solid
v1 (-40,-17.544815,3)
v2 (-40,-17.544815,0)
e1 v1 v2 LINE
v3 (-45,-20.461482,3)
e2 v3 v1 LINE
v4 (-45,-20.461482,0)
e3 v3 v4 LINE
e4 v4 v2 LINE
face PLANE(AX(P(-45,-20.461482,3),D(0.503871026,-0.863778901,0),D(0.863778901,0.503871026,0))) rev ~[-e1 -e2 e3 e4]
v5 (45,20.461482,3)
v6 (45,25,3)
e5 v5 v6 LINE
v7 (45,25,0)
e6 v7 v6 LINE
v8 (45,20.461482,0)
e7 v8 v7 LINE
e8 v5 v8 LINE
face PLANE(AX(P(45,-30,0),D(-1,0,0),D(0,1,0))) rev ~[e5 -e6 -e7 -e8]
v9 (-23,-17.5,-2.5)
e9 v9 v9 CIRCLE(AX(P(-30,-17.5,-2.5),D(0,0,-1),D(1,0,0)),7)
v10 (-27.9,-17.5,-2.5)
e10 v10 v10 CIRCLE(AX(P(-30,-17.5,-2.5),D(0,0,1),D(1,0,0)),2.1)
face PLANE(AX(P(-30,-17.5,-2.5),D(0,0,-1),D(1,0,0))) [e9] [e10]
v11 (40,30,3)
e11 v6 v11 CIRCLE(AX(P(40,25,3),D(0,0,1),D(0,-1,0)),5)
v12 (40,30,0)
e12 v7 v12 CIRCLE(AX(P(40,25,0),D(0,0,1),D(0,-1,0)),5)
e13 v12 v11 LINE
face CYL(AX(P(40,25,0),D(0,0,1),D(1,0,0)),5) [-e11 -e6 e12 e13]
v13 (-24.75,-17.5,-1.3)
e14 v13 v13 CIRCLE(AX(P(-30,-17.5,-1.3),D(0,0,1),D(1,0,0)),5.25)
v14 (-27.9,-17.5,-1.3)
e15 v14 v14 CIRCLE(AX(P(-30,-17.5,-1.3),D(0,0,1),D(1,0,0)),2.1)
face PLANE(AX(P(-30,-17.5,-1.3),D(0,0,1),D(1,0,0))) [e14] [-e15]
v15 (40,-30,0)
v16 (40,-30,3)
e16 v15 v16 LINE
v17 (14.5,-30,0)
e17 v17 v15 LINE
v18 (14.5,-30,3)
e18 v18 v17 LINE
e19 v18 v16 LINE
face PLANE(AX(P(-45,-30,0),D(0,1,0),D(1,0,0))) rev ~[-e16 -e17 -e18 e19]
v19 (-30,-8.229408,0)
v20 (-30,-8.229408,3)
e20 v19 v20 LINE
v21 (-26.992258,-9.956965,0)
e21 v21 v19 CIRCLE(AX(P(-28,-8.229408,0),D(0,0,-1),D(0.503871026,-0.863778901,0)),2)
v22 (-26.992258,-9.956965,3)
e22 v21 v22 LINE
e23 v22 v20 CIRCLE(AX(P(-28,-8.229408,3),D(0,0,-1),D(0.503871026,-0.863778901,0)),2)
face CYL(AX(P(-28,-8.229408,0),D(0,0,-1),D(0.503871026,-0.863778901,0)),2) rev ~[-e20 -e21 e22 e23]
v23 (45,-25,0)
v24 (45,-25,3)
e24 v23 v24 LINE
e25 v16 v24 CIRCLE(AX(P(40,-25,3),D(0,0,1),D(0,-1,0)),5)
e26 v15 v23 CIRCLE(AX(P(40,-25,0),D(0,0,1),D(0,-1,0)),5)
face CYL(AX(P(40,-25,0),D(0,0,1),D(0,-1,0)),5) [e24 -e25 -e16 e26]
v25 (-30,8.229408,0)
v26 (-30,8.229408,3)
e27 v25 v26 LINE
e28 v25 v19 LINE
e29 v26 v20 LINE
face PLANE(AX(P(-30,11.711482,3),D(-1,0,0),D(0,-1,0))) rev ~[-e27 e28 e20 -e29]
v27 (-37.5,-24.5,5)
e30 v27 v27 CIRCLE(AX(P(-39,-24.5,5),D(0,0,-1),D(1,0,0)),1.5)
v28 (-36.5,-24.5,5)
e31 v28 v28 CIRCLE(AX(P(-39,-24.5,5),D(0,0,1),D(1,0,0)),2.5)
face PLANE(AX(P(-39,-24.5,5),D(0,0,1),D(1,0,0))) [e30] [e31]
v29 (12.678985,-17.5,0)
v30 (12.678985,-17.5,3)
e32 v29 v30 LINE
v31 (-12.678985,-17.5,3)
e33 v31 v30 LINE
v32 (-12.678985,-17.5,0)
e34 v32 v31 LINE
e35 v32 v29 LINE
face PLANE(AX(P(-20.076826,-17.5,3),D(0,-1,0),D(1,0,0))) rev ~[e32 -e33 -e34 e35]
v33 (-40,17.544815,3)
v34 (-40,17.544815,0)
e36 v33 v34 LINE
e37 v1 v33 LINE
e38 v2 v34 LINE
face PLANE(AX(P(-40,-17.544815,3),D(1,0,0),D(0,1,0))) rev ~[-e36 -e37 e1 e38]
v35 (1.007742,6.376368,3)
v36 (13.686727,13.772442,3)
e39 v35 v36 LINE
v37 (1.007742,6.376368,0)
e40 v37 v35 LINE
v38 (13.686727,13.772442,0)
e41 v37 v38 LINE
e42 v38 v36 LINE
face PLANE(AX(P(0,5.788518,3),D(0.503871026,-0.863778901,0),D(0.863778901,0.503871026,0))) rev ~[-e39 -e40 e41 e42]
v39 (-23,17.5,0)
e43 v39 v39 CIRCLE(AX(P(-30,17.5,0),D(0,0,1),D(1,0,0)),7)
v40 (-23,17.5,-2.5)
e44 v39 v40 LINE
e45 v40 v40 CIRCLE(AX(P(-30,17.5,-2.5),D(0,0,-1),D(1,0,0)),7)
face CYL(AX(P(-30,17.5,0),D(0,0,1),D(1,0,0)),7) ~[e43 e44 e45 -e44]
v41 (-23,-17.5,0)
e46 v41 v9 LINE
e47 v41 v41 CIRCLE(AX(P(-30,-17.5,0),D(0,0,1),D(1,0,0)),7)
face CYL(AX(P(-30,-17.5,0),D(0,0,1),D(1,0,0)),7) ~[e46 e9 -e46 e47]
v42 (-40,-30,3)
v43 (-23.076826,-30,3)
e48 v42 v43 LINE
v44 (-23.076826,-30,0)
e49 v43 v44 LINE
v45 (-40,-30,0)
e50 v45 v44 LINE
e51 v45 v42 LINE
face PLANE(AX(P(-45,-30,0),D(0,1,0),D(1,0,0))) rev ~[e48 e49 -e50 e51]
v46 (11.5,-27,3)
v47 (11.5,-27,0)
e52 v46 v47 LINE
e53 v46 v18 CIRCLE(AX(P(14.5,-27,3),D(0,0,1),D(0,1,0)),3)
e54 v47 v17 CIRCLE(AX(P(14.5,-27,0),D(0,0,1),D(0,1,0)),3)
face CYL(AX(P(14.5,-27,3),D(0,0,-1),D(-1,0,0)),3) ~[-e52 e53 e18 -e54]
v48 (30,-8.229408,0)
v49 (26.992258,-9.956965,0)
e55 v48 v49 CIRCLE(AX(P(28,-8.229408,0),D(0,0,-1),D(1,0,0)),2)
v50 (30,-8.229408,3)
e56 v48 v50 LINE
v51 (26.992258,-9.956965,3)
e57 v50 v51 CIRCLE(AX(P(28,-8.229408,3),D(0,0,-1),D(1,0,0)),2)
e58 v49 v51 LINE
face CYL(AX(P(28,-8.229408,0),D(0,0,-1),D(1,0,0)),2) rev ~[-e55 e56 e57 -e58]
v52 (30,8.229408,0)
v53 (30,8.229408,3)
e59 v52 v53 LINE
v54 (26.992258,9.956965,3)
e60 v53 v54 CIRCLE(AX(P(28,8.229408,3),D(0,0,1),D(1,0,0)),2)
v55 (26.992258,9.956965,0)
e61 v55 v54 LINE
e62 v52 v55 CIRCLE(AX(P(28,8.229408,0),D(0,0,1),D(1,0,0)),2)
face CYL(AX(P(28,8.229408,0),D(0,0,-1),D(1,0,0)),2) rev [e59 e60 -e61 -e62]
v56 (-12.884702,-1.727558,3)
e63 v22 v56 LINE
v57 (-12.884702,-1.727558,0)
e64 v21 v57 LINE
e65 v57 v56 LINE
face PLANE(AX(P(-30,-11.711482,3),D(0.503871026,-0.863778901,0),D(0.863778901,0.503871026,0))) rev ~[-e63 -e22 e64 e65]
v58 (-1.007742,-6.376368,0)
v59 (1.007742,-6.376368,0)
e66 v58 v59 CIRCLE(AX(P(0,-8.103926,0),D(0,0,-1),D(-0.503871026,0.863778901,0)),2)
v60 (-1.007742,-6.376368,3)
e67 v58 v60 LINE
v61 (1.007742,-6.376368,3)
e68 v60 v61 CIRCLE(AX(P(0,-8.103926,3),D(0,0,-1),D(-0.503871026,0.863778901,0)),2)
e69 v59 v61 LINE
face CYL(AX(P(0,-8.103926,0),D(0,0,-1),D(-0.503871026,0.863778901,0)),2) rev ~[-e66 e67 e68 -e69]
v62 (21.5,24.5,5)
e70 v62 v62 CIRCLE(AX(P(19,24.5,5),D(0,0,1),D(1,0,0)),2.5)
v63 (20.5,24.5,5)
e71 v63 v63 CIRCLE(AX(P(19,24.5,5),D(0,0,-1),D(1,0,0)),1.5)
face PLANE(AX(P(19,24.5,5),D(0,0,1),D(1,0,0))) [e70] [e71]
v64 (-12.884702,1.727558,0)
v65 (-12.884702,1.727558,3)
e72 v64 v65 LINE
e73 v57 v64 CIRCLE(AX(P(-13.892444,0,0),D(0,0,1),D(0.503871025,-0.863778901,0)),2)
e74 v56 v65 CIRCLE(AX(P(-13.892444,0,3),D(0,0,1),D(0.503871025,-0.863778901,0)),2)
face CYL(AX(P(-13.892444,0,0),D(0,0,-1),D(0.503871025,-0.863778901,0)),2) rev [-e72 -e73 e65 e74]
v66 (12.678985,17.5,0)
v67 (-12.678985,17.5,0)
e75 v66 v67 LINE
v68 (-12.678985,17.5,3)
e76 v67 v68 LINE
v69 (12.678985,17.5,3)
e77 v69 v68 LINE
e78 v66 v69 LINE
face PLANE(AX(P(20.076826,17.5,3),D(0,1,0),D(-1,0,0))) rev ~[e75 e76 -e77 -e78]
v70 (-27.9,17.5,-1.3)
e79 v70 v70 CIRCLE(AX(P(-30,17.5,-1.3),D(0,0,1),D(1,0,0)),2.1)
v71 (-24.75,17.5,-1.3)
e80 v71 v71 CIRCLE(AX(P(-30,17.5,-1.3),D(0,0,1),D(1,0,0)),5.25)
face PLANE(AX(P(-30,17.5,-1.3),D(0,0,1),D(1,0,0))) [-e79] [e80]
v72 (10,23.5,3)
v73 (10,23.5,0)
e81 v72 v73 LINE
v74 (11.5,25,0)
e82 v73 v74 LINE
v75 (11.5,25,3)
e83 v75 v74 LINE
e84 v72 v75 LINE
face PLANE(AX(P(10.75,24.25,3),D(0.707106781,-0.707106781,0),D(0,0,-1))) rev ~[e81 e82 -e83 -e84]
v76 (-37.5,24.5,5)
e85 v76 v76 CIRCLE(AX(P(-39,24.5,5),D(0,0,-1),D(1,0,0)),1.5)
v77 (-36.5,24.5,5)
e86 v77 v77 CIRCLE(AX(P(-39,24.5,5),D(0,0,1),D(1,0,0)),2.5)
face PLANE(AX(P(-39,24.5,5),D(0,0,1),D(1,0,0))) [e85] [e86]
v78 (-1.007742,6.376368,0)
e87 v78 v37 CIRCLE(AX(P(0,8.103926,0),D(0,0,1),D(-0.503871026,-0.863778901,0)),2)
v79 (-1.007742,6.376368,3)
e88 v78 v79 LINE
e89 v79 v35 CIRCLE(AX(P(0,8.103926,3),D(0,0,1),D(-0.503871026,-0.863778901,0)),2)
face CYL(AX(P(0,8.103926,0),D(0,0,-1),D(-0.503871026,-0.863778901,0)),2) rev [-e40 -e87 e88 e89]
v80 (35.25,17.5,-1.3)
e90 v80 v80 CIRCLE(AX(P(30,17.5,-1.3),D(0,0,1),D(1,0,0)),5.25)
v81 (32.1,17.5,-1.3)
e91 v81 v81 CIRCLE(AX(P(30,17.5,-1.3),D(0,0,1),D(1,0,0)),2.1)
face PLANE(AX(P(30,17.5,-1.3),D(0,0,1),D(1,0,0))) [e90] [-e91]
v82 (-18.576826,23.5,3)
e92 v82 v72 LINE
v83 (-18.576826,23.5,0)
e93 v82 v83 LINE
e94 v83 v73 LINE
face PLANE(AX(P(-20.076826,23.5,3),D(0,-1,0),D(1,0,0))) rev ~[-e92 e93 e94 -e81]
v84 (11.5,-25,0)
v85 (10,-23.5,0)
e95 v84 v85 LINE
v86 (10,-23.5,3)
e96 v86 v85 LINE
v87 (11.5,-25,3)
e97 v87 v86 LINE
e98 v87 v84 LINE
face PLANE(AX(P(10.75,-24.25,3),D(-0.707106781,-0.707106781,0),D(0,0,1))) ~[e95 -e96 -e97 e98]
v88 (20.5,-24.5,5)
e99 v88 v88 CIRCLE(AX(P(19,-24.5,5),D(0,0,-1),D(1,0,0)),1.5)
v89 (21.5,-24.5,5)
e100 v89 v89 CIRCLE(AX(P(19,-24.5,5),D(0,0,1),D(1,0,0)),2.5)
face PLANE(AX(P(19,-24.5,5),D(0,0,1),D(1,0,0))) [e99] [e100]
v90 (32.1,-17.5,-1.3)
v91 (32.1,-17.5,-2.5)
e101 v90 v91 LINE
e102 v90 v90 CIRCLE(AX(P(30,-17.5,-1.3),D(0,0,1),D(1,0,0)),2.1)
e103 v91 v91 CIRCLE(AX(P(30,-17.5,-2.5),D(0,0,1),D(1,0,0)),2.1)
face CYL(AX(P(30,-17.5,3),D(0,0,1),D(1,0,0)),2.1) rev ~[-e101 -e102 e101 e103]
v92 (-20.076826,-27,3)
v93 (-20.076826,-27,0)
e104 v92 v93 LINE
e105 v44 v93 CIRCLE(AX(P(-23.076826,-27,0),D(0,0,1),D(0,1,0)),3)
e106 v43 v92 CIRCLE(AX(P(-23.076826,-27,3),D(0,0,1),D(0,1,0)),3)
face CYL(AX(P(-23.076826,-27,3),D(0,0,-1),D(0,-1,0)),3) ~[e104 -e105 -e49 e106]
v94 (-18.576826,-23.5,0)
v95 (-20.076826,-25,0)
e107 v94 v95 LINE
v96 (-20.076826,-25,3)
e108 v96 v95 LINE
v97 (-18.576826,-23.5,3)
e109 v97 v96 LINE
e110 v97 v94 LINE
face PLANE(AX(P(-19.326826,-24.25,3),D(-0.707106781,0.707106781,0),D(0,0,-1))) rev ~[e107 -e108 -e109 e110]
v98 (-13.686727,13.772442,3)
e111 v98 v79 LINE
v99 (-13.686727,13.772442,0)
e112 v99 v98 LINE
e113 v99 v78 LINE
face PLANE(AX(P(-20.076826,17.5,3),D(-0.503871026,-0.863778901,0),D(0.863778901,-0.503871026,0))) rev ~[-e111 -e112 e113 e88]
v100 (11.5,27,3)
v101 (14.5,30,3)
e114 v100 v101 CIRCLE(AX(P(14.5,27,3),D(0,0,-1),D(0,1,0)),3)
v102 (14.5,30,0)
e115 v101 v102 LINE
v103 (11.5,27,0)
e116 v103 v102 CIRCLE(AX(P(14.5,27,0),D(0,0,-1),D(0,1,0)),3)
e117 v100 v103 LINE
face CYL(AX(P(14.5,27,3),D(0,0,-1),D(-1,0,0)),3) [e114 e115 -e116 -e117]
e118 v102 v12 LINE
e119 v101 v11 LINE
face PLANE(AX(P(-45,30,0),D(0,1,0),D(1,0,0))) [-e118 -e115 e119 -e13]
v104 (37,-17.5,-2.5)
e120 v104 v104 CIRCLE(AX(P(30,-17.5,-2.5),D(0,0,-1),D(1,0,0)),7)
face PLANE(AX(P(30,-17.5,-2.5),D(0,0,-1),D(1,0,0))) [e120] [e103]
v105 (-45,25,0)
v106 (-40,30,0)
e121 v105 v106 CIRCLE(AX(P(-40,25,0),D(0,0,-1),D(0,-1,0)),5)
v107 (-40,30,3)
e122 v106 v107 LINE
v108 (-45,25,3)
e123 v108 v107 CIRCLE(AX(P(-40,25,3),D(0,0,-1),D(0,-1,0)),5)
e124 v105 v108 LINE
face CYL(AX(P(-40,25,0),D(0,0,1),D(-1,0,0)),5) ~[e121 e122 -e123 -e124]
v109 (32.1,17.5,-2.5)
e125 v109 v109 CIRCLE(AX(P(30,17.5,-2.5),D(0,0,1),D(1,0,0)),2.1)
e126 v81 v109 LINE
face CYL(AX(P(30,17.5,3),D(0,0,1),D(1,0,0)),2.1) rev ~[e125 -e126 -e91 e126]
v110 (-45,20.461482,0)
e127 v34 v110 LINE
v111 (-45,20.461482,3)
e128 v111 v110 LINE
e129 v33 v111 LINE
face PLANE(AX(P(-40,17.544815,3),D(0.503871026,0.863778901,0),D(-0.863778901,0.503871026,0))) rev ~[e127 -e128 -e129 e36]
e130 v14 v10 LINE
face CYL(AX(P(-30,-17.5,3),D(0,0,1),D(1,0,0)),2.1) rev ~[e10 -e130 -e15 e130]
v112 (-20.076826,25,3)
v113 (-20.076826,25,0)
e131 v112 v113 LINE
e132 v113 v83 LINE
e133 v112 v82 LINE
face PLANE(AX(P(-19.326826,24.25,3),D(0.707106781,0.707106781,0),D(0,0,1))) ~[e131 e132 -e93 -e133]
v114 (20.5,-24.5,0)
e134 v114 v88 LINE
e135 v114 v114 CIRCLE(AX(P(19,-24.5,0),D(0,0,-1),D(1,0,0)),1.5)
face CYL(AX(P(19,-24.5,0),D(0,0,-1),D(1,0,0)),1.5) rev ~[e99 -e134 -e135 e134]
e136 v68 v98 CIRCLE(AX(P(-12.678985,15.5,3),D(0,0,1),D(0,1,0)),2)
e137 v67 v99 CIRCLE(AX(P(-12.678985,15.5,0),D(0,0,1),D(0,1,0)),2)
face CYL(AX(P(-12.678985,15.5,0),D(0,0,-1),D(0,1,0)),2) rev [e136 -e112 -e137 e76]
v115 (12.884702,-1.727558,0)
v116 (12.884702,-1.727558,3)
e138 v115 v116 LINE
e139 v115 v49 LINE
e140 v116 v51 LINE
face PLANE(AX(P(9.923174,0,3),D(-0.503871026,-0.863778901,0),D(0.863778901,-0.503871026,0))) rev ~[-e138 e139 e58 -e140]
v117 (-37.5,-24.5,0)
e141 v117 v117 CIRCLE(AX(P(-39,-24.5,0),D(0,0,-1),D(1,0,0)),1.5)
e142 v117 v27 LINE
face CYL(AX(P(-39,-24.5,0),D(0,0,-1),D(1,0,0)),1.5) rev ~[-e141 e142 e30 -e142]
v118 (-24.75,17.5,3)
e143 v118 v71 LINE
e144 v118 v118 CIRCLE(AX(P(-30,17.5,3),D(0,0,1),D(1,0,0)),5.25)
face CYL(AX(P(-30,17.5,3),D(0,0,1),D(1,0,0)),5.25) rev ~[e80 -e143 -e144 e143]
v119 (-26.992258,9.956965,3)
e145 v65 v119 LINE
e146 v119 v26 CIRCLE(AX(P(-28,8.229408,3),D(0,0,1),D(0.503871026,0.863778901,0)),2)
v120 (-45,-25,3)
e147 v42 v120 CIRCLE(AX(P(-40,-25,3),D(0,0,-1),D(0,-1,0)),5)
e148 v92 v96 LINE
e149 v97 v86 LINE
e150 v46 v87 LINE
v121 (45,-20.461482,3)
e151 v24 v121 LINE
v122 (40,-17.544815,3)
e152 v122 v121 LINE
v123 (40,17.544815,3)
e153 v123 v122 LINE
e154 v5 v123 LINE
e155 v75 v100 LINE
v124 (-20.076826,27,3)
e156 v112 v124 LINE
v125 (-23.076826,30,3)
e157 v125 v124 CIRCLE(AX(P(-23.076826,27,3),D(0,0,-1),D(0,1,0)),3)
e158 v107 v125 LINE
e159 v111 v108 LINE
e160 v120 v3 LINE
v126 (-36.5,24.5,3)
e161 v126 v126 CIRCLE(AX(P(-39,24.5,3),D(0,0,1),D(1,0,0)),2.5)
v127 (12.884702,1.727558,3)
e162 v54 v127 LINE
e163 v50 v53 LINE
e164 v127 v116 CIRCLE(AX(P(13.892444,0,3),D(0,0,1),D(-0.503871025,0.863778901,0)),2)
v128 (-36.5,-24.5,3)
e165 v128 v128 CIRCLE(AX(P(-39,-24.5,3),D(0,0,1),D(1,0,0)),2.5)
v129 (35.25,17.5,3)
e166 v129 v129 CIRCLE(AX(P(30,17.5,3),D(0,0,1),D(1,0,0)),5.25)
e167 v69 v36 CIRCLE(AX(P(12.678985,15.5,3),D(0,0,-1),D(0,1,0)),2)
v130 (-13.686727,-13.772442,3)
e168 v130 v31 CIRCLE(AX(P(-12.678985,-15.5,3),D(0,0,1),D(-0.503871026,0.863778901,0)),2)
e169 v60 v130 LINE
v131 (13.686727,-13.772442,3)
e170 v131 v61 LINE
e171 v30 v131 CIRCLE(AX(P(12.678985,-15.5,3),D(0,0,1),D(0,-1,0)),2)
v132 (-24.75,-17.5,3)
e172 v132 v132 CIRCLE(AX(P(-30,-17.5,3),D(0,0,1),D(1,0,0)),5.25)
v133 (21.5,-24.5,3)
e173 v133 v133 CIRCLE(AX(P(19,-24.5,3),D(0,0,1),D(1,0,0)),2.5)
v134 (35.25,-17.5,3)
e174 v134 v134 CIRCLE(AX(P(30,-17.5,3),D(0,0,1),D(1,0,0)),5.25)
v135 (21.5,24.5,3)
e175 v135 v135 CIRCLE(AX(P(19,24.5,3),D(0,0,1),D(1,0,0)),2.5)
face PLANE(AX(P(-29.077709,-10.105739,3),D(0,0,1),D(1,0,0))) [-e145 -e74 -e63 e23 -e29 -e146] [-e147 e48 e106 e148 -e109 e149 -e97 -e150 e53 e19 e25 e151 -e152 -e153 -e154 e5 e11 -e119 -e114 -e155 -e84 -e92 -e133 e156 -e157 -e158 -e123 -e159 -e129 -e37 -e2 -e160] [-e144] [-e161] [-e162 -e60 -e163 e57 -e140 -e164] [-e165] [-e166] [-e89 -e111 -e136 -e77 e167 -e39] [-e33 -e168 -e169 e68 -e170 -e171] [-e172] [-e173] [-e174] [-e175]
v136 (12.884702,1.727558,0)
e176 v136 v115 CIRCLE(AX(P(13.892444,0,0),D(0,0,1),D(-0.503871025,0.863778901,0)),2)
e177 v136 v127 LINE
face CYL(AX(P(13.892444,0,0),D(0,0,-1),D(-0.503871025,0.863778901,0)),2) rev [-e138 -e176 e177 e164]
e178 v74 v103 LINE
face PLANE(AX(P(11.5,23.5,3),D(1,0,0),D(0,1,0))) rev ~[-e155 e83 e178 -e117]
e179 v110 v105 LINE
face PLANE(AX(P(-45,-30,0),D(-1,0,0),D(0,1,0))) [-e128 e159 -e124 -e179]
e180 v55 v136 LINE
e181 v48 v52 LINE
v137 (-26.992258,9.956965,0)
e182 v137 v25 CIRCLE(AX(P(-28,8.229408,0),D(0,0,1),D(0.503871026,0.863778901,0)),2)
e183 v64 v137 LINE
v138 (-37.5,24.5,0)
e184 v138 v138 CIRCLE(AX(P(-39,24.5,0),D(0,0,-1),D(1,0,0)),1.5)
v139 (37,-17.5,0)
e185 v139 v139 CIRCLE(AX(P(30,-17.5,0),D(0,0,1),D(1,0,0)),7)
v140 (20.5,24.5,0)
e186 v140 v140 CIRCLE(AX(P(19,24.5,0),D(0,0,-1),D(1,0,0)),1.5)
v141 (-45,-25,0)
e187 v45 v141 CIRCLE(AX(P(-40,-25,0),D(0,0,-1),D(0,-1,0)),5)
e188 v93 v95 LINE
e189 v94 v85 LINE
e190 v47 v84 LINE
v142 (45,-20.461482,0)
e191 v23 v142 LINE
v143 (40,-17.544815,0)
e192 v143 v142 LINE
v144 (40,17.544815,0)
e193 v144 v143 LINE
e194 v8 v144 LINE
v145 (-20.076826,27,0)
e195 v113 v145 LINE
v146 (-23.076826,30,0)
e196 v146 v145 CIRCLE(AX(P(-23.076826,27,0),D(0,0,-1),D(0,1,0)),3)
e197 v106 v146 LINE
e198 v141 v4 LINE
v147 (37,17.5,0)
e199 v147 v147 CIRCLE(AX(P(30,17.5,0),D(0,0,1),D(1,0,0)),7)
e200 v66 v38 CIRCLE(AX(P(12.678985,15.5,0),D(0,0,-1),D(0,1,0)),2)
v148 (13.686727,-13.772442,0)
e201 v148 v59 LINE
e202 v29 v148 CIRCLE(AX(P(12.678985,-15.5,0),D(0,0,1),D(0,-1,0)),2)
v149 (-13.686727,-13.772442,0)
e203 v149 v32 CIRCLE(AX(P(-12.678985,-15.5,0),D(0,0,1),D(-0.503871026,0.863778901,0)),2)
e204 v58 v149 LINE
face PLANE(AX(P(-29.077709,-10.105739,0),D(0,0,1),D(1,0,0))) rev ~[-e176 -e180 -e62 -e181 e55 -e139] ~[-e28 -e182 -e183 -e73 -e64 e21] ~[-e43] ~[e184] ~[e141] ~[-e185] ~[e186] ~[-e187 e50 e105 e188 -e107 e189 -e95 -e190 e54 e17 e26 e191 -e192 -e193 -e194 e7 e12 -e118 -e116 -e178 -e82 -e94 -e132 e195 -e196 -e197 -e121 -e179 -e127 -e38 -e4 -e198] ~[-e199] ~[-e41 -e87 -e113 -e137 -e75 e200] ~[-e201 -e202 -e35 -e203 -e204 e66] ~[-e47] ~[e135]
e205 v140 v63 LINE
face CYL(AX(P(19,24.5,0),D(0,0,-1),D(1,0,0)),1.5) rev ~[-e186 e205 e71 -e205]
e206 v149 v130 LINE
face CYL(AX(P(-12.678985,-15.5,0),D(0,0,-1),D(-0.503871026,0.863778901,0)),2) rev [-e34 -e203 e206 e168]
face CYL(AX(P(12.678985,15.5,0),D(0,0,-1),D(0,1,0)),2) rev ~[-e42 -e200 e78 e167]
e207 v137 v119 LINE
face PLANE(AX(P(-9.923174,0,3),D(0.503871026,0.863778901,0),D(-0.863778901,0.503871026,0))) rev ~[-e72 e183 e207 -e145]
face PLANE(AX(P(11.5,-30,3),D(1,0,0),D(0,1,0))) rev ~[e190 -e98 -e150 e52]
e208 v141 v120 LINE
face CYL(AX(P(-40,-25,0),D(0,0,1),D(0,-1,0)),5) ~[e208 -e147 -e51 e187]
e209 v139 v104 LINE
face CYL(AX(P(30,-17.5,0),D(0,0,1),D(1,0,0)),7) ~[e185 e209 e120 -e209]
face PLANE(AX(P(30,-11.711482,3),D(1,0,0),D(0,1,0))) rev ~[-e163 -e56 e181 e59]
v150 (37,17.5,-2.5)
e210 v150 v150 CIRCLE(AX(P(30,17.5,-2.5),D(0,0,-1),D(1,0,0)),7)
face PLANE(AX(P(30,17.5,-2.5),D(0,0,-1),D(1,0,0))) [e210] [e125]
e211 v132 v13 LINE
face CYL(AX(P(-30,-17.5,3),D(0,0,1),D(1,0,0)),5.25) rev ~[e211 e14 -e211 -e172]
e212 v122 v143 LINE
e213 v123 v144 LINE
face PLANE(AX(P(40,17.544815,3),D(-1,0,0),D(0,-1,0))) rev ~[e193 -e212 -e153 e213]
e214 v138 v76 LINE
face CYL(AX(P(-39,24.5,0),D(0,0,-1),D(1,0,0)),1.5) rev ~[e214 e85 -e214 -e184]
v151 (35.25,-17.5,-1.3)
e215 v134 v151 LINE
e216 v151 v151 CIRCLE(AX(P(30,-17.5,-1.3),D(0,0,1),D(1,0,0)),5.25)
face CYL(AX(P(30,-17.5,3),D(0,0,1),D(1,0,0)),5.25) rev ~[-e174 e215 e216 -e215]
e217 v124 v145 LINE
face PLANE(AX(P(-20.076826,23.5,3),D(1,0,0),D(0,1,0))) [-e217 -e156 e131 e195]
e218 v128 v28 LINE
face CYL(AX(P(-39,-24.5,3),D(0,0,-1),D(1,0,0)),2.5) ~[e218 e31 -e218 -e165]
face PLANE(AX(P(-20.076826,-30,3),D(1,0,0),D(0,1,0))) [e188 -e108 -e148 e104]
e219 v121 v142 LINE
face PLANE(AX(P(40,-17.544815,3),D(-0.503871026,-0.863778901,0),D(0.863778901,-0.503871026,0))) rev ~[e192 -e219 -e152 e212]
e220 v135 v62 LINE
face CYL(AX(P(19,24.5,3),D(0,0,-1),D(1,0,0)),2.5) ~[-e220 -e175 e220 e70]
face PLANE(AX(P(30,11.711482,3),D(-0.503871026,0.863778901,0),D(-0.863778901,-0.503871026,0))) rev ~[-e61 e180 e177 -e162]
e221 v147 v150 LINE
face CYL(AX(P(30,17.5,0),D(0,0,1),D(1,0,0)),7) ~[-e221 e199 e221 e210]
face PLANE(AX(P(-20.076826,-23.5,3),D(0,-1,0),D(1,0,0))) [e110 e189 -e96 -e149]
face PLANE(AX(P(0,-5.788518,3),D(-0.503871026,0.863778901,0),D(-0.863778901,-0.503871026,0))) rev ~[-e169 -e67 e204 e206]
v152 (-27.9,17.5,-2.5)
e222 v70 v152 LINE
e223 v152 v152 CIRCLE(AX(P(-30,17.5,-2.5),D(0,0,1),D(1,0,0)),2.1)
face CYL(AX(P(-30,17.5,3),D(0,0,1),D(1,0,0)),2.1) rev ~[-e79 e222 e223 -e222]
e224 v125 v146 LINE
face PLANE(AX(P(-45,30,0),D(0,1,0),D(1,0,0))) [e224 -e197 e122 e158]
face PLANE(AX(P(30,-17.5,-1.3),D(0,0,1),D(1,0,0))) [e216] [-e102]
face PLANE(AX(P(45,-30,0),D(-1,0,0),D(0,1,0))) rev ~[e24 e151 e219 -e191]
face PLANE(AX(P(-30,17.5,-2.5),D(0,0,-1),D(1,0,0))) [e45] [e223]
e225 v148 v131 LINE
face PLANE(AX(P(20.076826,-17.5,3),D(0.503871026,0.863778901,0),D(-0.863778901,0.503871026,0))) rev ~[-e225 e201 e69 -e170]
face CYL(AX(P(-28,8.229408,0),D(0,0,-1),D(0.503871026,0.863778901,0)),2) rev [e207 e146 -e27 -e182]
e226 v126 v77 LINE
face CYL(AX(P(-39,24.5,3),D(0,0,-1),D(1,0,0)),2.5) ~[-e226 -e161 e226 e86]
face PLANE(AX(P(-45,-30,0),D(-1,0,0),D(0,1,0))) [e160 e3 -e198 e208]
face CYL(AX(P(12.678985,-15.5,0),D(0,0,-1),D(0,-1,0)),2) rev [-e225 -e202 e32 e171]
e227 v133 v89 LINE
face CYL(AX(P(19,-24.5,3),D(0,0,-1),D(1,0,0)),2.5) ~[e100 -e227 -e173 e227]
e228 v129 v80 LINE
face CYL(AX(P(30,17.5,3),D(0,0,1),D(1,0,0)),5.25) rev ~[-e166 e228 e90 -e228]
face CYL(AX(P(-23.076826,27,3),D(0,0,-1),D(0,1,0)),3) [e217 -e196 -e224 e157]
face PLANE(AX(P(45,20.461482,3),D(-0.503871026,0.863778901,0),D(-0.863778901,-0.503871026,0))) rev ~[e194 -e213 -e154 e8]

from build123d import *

# Parameters (mm, degrees)
F0_W         = 90
F0_H         = 60
F1_DEPTH     = 3
F2_R         = 2.5
F3_DEPTH     = 2
F4_R         = 1.5
F5_DEPTH     = 5
F6_R         = 7
F7_DEPTH     = 2.5
F8_R         = 5.25
F8_R_2       = 2.1
F9_DEPTH     = 4.3
F10_DEPTH    = 5.5
F11_W        = 31.5768257218
F11_H        = 6.5
F12_DEPTH    = 3
F13_T1_DEPTH = 3
F14_SIZE     = 1.5
F15_R        = 5
F16_R        = 3


# Not quite as in the source:
# - a fillet or chamfer that OpenCascade refuses, or shapes differently, is made with other operations: its cross-section is extruded or revolved along the edge and cut away or added


with BuildPart() as f1:
    # F0 (on Top) → F1 (new body)
    with BuildSketch(Plane.XY):
        Rectangle(F0_W, F0_H)
    extrude(amount=F1_DEPTH)

    # F2 (on face) → F3 (join)
    with BuildSketch(Plane.XY.offset(3)):
        with Locations((-39, 24.5)):
            Circle(F2_R)
        with Locations((19, 24.5)):
            Circle(F2_R)
        with Locations((19, -24.5)):
            Circle(F2_R)
        with Locations((-39, -24.5)):
            Circle(F2_R)
    extrude(amount=F3_DEPTH)

    # F4 (on face) → F5 (cut, through all)
    with BuildSketch(Plane(origin=(0, 0, 0), x_dir=(1, 0, 0), z_dir=(0, 0, -1))):
        with Locations((-39, 24.5)):
            Circle(F4_R)
        with Locations((19, 24.5)):
            Circle(F4_R)
        with Locations((19, -24.5)):
            Circle(F4_R)
        with Locations((-39, -24.5)):
            Circle(F4_R)
    extrude(amount=-F5_DEPTH, mode=Mode.SUBTRACT)

    # F6 (on face) → F7 (join)
    with BuildSketch(Plane(origin=(0, 0, 0), x_dir=(1, 0, 0), z_dir=(0, 0, -1))):
        with Locations((30, -17.5)):
            Circle(F6_R)
        with Locations((30, 17.5)):
            Circle(F6_R)
        with Locations((-30, -17.5)):
            Circle(F6_R)
        with Locations((-30, 17.5)):
            Circle(F6_R)
    extrude(amount=F7_DEPTH)

    # F8 (on face) → F9 (cut)
    with BuildSketch(Plane.XY.offset(3)):
        with Locations((30, -17.5)):
            Circle(F8_R)
        with Locations((30, -17.5)):
            Circle(F8_R_2, mode=Mode.SUBTRACT)
        with Locations((-30, -17.5)):
            Circle(F8_R)
        with Locations((-30, -17.5)):
            Circle(F8_R_2, mode=Mode.SUBTRACT)
        with Locations((-30, 17.5)):
            Circle(F8_R)
        with Locations((-30, 17.5)):
            Circle(F8_R_2, mode=Mode.SUBTRACT)
        with Locations((30, 17.5)):
            Circle(F8_R)
        with Locations((30, 17.5)):
            Circle(F8_R_2, mode=Mode.SUBTRACT)
    extrude(amount=-F9_DEPTH, mode=Mode.SUBTRACT)

    # F8 (on face) → F10 (cut, through all)
    with BuildSketch(Plane.XY.offset(3)):
        with Locations((-30, -17.5)):
            Circle(F8_R_2)
        with Locations((-30, 17.5)):
            Circle(F8_R_2)
        with Locations((30, 17.5)):
            Circle(F8_R_2)
        with Locations((30, -17.5)):
            Circle(F8_R_2)
    extrude(amount=-F10_DEPTH, mode=Mode.SUBTRACT)

    # F11 (on face) → F12 (cut, through all)
    with BuildSketch(Plane.XY.offset(3)):
        Polygon((-40, 17.5448150044), (-45, 20.4614816711), (-45, -20.4614816711), (-40, -17.5448150044), align=None)
        Polygon((-9.9231742782, 0), (-30, 11.7114816711), (-30, -11.7114816711), align=None)
        Polygon((20.0768257218, 17.5), (-20.0768257218, 17.5), (0, 5.7885183289), align=None)
        Polygon((0, -5.7885183289), (-20.0768257218, -17.5), (20.0768257218, -17.5), align=None)
        Polygon((30, 11.7114816711), (9.9231742782, 0), (30, -11.7114816711), align=None)
        Polygon((45, -20.4614816711), (45, 20.4614816711), (40, 17.5448150044), (40, -17.5448150044), align=None)
        with Locations((-4.2884128609, 26.75)):
            Rectangle(F11_W, F11_H)
        with Locations((-4.2884128609, -26.75)):
            Rectangle(F11_W, F11_H)
    extrude(amount=-F12_DEPTH, mode=Mode.SUBTRACT)

    # F13: fillet of radius 2 on 12 edges, made by hand

    # F13_s2 → F13_t1 (join)
    with BuildSketch(Plane.XY):
        with BuildLine():
            ThreePointArc((-26.992257949, -9.9569654746), (-28.9961214529, -9.963691978), (-30, -8.2294076728))
            Line((-30, -8.2294076728), (-30, -11.7114816711))
            Line((-30, -11.7114816711), (-26.992257949, -9.9569654746))
        make_face()
        with BuildLine():
            ThreePointArc((-26.992257949, 9.9569654746), (-28.9961214529, 9.963691978), (-30, 8.2294076728))
            Line((-30, 8.2294076728), (-30, 11.7114816711))
            Line((-30, 11.7114816711), (-26.992257949, 9.9569654746))
        make_face()
        with BuildLine():
            ThreePointArc((-12.8847019384, -1.7275578018), (-11.8924439894, 0), (-12.8847019384, 1.7275578018))
            Line((-12.8847019384, 1.7275578018), (-9.9231742782, 0))
            Line((-9.9231742782, 0), (-12.8847019384, -1.7275578018))
        make_face()
        with BuildLine():
            ThreePointArc((12.8847019384, 1.7275578018), (11.8924439894, 0), (12.8847019384, -1.7275578018))
            Line((12.8847019384, -1.7275578018), (9.9231742782, 0))
            Line((9.9231742782, 0), (12.8847019384, 1.7275578018))
        make_face()
        with BuildLine():
            ThreePointArc((30, -8.2294076728), (28.9961214529, -9.963691978), (26.992257949, -9.9569654746))
            Line((26.992257949, -9.9569654746), (30, -11.7114816711))
            Line((30, -11.7114816711), (30, -8.2294076728))
        make_face()
        with BuildLine():
            ThreePointArc((30, 8.2294076728), (28.9961214529, 9.963691978), (26.992257949, 9.9569654746))
            Line((26.992257949, 9.9569654746), (30, 11.7114816711))
            Line((30, 11.7114816711), (30, 8.2294076728))
        make_face()
        with BuildLine():
            ThreePointArc((12.678984582, 17.5), (14.6096730089, 16.0219599584), (13.686726633, 13.7724421982))
            Line((13.686726633, 13.7724421982), (20.0768257218, 17.5))
            Line((20.0768257218, 17.5), (12.678984582, 17.5))
        make_face()
        with BuildLine():
            ThreePointArc((12.678984582, -17.5), (14.6096730089, -16.0219599584), (13.686726633, -13.7724421982))
            Line((13.686726633, -13.7724421982), (20.0768257218, -17.5))
            Line((20.0768257218, -17.5), (12.678984582, -17.5))
        make_face()
        with BuildLine():
            ThreePointArc((-13.686726633, -13.7724421982), (-14.6096730089, -16.0219599584), (-12.678984582, -17.5))
            Line((-12.678984582, -17.5), (-20.0768257218, -17.5))
            Line((-20.0768257218, -17.5), (-13.686726633, -13.7724421982))
        make_face()
        with BuildLine():
            ThreePointArc((-12.678984582, 17.5), (-14.6096730089, 16.0219599584), (-13.686726633, 13.7724421982))
            Line((-13.686726633, 13.7724421982), (-20.0768257218, 17.5))
            Line((-20.0768257218, 17.5), (-12.678984582, 17.5))
        make_face()
        with BuildLine():
            ThreePointArc((-1.007742051, 6.3763678587), (0, 6.1039256605), (1.007742051, 6.3763678587))
            Line((1.007742051, 6.3763678587), (0, 5.7885183289))
            Line((0, 5.7885183289), (-1.007742051, 6.3763678587))
        make_face()
        with BuildLine():
            ThreePointArc((-1.007742051, -6.3763678587), (0, -6.1039256605), (1.007742051, -6.3763678587))
            Line((1.007742051, -6.3763678587), (0, -5.7885183289))
            Line((0, -5.7885183289), (-1.007742051, -6.3763678587))
        make_face()
    extrude(amount=F13_T1_DEPTH)

    # F14
    f14_edges = [f1.edges().sort_by_distance(p)[0] for p in [
        (11.5, -23.5, 1.5),
        (-20.076826, -23.5, 1.5),
        (11.5, 23.5, 1.5),
        (-20.076826, 23.5, 1.5),
    ]]
    chamfer(f14_edges, length=F14_SIZE)

    # F15
    f15_edges = [f1.edges().sort_by_distance(p)[0] for p in [
        (45, -30, 1.5),
        (45, 30, 1.5),
        (-45, 30, 1.5),
        (-45, -30, 1.5),
    ]]
    fillet(f15_edges, radius=F15_R)

    # F16
    f16_edges = [f1.edges().sort_by_distance(p)[0] for p in [
        (11.5, -30, 1.5),
        (-20.076826, 30, 1.5),
        (11.5, 30, 1.5),
        (-20.076826, -30, 1.5),
    ]]
    fillet(f16_edges, radius=F16_R)


solid = f1.part
